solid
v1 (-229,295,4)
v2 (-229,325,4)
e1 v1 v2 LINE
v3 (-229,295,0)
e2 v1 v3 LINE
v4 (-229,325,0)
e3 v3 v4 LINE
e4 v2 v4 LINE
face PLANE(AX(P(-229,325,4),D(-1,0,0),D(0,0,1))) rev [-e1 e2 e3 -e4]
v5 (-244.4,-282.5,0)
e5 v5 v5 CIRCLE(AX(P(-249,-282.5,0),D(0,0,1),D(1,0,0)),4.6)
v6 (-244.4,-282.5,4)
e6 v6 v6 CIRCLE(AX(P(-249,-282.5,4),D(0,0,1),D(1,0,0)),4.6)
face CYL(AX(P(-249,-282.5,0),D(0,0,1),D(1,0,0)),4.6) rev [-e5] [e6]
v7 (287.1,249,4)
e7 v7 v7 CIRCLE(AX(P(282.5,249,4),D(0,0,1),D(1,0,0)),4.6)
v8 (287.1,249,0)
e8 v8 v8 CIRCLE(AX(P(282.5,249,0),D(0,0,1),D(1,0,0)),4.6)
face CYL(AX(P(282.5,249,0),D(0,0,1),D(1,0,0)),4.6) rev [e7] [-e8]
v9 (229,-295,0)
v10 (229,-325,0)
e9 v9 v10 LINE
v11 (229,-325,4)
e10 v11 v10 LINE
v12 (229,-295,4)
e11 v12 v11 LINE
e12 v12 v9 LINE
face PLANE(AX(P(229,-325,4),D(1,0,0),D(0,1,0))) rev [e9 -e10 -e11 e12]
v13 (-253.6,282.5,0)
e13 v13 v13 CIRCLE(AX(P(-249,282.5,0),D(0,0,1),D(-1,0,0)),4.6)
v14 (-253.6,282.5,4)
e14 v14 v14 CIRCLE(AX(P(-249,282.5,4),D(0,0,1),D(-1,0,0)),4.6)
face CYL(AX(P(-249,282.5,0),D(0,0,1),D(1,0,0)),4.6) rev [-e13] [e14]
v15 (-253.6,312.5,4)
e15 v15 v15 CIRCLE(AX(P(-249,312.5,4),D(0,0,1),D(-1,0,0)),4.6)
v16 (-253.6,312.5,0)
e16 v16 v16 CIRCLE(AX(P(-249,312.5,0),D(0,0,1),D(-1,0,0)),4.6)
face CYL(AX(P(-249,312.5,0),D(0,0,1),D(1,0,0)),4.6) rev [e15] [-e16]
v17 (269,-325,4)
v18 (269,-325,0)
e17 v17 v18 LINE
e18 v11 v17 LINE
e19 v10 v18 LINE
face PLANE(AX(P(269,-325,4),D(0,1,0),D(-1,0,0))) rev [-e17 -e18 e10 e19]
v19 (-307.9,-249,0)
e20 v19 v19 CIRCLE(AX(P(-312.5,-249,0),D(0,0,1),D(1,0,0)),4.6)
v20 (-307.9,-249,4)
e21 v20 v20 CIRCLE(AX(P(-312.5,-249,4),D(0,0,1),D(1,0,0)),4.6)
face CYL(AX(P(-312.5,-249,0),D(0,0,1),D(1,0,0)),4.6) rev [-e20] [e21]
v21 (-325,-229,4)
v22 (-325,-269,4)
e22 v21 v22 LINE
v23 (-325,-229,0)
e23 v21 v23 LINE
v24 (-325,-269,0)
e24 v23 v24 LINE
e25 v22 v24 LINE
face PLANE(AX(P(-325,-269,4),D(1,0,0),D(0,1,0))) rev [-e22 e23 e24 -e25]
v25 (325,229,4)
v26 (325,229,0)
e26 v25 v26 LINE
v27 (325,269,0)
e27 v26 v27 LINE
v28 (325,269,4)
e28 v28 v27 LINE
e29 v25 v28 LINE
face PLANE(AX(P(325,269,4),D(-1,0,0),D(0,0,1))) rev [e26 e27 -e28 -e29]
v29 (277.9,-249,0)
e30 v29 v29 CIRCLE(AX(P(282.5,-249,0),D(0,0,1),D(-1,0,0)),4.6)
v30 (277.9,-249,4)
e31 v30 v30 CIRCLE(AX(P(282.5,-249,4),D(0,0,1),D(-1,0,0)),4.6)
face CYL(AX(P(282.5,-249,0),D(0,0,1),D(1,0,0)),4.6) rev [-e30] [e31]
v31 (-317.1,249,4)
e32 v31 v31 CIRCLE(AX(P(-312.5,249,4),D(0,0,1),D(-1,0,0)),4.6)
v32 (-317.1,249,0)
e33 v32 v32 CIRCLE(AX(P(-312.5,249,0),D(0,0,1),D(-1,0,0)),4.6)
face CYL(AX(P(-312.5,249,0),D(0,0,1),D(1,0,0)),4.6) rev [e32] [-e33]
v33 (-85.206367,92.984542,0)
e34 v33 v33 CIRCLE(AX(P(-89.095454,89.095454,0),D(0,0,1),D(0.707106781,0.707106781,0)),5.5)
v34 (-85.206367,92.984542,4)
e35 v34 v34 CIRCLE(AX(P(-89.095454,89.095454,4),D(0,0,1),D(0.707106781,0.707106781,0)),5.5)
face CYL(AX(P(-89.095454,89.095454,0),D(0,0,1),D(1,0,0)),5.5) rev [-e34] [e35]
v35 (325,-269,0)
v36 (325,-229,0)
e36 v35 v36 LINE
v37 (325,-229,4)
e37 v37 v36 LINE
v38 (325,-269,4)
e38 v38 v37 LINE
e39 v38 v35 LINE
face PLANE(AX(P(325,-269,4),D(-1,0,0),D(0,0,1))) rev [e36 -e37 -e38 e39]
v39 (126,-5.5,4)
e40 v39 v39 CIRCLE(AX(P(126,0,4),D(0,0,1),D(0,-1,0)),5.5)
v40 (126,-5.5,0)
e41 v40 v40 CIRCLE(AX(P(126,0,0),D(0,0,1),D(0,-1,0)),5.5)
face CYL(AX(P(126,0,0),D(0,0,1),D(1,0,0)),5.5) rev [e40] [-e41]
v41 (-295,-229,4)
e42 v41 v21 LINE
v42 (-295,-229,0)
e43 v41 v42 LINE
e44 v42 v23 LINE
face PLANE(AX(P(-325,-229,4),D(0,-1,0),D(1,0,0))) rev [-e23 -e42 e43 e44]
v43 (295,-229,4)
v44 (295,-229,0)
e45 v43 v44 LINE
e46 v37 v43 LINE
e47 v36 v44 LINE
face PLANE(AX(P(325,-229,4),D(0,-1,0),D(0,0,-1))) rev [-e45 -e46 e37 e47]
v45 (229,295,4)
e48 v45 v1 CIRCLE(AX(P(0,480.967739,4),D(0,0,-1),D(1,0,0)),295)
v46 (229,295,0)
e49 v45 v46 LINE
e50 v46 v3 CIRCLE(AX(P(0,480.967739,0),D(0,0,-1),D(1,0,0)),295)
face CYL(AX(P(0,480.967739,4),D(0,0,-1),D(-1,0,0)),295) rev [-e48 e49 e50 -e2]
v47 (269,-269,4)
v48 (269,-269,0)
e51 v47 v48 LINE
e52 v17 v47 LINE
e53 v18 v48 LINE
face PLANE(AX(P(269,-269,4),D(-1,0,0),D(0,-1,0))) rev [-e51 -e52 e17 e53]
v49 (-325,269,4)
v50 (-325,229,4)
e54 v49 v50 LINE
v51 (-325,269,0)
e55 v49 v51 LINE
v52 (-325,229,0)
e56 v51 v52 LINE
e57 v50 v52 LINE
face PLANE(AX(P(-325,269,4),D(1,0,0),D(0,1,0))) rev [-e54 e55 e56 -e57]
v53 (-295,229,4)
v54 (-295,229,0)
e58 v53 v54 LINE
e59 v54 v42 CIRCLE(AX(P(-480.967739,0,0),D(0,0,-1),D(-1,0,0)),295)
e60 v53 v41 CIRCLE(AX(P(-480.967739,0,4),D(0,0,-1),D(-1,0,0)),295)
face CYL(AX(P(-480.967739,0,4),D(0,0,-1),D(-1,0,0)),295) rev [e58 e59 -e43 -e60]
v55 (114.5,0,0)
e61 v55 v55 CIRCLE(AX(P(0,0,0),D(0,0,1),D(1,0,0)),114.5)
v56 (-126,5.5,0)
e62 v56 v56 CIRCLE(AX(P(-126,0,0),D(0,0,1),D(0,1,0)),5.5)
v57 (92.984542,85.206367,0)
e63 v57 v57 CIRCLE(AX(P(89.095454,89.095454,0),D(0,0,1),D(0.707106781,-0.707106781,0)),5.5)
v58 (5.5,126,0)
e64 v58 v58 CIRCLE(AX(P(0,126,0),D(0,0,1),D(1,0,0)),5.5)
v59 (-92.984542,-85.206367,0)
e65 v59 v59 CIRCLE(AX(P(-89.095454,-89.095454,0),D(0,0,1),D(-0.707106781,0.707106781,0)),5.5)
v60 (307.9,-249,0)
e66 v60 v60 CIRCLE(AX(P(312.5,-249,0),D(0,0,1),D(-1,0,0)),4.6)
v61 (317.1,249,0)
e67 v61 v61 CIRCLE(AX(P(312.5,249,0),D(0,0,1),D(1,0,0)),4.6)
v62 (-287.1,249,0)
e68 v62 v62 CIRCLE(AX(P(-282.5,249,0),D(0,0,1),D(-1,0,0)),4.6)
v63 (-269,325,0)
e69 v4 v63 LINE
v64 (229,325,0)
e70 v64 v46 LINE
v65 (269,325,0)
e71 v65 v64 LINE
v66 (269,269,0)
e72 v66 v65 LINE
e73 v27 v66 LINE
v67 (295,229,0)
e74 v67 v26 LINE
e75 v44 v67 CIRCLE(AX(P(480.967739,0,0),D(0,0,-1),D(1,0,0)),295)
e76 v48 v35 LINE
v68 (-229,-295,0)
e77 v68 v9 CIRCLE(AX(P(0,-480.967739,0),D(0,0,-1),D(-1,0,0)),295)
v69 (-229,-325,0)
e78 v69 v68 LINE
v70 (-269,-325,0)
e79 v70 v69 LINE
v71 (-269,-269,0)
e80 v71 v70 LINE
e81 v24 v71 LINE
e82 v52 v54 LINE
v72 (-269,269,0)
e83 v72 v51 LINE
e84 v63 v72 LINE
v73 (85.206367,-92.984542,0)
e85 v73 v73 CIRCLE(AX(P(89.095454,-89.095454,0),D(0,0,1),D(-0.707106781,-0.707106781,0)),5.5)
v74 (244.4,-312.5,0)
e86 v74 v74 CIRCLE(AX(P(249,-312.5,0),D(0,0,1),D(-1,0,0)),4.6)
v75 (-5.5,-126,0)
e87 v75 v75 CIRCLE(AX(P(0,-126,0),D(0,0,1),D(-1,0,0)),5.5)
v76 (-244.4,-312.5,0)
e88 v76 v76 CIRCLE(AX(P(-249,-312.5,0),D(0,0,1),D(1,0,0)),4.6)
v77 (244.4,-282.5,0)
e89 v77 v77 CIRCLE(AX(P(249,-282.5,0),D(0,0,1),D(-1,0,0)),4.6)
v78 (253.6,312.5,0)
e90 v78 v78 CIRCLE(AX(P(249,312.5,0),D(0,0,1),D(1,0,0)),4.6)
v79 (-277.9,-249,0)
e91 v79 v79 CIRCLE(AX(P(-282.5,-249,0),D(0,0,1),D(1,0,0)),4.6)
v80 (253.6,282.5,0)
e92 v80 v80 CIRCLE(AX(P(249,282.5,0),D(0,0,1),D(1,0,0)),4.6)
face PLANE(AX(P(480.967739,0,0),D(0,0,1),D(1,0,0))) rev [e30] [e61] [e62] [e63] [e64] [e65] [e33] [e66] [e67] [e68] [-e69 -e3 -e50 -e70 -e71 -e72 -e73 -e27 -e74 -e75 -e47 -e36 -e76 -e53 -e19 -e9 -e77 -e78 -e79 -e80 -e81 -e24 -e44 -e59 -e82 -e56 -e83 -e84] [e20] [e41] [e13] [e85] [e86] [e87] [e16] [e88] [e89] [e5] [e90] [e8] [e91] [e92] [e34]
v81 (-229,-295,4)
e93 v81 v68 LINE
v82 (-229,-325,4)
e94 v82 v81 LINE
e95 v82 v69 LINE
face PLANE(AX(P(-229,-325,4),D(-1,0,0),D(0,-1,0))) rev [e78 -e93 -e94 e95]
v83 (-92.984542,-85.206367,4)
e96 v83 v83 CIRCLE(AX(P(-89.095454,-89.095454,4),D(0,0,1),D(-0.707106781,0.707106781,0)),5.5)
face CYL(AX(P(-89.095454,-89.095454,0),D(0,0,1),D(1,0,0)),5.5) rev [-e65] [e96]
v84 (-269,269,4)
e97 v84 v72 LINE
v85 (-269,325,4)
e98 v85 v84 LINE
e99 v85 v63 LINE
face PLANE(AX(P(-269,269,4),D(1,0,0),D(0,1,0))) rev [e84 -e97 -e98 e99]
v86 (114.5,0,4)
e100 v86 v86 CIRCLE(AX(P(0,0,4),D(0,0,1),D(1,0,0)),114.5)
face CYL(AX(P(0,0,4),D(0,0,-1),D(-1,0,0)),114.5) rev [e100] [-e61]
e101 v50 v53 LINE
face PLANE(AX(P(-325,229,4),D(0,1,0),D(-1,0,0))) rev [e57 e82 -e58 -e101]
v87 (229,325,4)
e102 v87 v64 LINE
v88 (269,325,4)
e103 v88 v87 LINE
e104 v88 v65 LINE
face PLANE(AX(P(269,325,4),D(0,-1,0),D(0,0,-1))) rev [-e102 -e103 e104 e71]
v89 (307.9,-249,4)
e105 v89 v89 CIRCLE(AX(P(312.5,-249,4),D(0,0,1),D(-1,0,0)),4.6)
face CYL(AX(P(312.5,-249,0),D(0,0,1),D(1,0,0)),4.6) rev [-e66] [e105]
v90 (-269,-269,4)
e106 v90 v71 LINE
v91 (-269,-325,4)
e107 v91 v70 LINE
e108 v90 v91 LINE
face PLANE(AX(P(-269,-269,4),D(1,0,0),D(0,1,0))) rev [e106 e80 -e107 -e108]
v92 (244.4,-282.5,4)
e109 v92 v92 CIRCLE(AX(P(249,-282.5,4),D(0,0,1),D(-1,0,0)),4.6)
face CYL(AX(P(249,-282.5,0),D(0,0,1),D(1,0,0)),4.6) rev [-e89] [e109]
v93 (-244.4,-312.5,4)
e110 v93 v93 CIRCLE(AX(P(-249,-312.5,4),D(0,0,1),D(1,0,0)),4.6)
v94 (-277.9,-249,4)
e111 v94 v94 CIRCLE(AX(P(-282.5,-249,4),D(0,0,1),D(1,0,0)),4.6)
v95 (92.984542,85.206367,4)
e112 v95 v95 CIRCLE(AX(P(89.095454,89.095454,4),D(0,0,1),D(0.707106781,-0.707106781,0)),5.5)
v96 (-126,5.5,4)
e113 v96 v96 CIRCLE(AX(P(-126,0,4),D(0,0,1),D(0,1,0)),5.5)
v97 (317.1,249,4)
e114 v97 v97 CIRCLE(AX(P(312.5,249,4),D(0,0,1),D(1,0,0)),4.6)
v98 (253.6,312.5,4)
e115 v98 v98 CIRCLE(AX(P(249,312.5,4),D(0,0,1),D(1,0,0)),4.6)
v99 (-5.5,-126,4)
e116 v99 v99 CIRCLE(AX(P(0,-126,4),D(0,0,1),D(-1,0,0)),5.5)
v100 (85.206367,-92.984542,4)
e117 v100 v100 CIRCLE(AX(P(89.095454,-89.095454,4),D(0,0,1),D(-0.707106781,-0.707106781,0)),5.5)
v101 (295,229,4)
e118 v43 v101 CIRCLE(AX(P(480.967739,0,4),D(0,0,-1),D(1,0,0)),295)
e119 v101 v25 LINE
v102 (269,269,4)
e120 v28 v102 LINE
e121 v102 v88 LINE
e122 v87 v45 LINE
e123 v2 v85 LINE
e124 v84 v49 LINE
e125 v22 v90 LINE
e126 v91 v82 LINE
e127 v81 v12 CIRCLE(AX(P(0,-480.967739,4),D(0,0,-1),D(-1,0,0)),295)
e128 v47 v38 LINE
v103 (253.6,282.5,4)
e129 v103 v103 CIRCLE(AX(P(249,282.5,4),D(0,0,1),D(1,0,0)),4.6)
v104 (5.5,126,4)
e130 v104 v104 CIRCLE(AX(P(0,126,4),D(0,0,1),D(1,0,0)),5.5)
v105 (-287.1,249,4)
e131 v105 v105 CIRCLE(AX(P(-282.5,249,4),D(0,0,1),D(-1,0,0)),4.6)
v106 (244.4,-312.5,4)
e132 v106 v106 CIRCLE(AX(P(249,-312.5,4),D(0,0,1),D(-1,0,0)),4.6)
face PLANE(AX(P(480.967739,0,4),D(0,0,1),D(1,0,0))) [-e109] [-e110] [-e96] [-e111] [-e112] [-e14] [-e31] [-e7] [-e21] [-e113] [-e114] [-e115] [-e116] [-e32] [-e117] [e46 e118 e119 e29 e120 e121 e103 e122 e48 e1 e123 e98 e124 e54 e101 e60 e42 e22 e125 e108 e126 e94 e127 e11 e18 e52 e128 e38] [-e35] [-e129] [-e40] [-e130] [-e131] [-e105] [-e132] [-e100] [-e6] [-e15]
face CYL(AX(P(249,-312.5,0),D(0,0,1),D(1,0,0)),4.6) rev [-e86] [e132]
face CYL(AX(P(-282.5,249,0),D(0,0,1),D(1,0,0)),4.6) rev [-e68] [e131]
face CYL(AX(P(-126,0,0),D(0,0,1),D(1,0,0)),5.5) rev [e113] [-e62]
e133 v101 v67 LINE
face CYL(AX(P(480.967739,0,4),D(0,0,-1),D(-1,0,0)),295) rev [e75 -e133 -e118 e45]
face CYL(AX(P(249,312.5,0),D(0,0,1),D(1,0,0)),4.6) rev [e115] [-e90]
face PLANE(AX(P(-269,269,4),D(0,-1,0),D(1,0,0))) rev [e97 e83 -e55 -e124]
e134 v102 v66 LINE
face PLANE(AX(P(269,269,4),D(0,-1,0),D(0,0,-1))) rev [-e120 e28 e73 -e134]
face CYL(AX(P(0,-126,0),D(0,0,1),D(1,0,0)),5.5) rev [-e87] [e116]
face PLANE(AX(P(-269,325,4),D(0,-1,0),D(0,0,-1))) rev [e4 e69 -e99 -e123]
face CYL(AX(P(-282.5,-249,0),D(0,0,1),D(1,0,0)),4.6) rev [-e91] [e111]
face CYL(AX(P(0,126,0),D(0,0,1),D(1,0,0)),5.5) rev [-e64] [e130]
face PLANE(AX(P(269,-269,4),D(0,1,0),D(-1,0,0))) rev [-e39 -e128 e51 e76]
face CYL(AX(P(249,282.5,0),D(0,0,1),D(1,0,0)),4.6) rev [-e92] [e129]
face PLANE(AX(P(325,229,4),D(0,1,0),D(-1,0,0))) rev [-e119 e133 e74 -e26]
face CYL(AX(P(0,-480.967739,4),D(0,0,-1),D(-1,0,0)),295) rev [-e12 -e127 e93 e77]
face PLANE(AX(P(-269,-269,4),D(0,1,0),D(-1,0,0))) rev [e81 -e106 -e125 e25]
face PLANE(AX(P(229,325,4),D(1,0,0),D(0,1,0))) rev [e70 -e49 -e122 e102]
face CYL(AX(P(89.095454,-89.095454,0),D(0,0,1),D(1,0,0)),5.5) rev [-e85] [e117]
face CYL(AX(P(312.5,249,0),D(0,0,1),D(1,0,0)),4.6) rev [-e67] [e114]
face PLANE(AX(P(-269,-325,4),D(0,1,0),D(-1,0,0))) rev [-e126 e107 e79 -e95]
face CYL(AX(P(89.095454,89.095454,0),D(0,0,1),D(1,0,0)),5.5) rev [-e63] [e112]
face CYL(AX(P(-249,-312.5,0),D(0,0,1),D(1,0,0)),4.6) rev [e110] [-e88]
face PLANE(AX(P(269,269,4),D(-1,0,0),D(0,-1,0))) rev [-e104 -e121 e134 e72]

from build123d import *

# Parameters (mm, degrees)
SKETCH1_R          = 114.5
BASE_FLANGE1_DEPTH = 4
SKETCH2_R          = 4.6
EXTRUDE1_DEPTH     = 4
SKETCH3_R          = 5.5
EXTRUDE2_DEPTH     = 4
CIRPATTERN1_COUNT  = 8


# Sheet-metal steps are written as plain solids
with BuildPart() as part:
    # Sketch1 → Base-Flange1 (new body)
    with BuildSketch(Plane.XY):
        with BuildLine():
            Line((269, 269), (269, 325))
            Line((269, 325), (229, 325))
            Line((229, 325), (229, 295))
            ThreePointArc((229, 295), (0, 185.967739138), (-229, 295))
            Line((-229, 295), (-229, 325))
            Line((-229, 325), (-269, 325))
            Line((-269, 325), (-269, 269))
            Line((-269, 269), (-325, 269))
            Line((-325, 269), (-325, 229))
            Line((-325, 229), (-295, 229))
            ThreePointArc((-295, 229), (-185.967739138, 0), (-295, -229))
            Line((-295, -229), (-325, -229))
            Line((-325, -229), (-325, -269))
            Line((-325, -269), (-269, -269))
            Line((-269, -269), (-269, -325))
            Line((-269, -325), (-229, -325))
            Line((-229, -325), (-229, -295))
            ThreePointArc((-229, -295), (0, -185.967739138), (229, -295))
            Line((229, -295), (229, -325))
            Line((229, -325), (269, -325))
            Line((269, -325), (269, -269))
            Line((269, -269), (325, -269))
            Line((325, -269), (325, -229))
            Line((325, -229), (295, -229))
            ThreePointArc((295, -229), (185.967739138, 0), (295, 229))
            Line((295, 229), (325, 229))
            Line((325, 229), (325, 269))
            Line((325, 269), (269, 269))
        make_face()
        Circle(SKETCH1_R, mode=Mode.SUBTRACT)
    extrude(amount=BASE_FLANGE1_DEPTH)

    # Sketch2 → Extrude1 (cut)
    with BuildSketch(Plane.XY.offset(4)):
        with Locations((249, 312.5)):
            Circle(SKETCH2_R)
        with Locations((249, 282.5)):
            Circle(SKETCH2_R)
        with Locations((282.5, 249)):
            Circle(SKETCH2_R)
        with Locations((312.5, 249)):
            Circle(SKETCH2_R)
        with Locations(Location((312.5, -249, 0), (0, 0, 180))):
            Circle(SKETCH2_R)
        with Locations(Location((282.5, -249, 0), (0, 0, 180))):
            Circle(SKETCH2_R)
        with Locations(Location((249, -282.5, 0), (0, 0, 180))):
            Circle(SKETCH2_R)
        with Locations(Location((249, -312.5, 0), (0, 0, 180))):
            Circle(SKETCH2_R)
        with Locations((-249, -312.5)):
            Circle(SKETCH2_R)
        with Locations((-249, -282.5)):
            Circle(SKETCH2_R)
        with Locations((-282.5, -249)):
            Circle(SKETCH2_R)
        with Locations((-312.5, -249)):
            Circle(SKETCH2_R)
        with Locations(Location((-312.5, 249, 0), (0, 0, 180))):
            Circle(SKETCH2_R)
        with Locations(Location((-282.5, 249, 0), (0, 0, 180))):
            Circle(SKETCH2_R)
        with Locations(Location((-249, 282.5, 0), (0, 0, 180))):
            Circle(SKETCH2_R)
        with Locations(Location((-249, 312.5, 0), (0, 0, 180))):
            Circle(SKETCH2_R)
    extrude(amount=-EXTRUDE1_DEPTH, mode=Mode.SUBTRACT)

    # Sketch3 → Extrude2 (cut)
    with BuildSketch(Plane.XY.offset(4)):
        with Locations((0, 126)):
            Circle(SKETCH3_R)
    extrude2 = extrude(amount=-EXTRUDE2_DEPTH, mode=Mode.SUBTRACT)

    # CirPattern1: Extrude2 ×8 about axis
    cirpattern1_axis = Axis((0, 0, 0), (0, 0, 1))
    for i in range(1, CIRPATTERN1_COUNT):
        add(extrude2.rotate(cirpattern1_axis, i * 360 / CIRPATTERN1_COUNT), mode=Mode.SUBTRACT)


solid = part.part
